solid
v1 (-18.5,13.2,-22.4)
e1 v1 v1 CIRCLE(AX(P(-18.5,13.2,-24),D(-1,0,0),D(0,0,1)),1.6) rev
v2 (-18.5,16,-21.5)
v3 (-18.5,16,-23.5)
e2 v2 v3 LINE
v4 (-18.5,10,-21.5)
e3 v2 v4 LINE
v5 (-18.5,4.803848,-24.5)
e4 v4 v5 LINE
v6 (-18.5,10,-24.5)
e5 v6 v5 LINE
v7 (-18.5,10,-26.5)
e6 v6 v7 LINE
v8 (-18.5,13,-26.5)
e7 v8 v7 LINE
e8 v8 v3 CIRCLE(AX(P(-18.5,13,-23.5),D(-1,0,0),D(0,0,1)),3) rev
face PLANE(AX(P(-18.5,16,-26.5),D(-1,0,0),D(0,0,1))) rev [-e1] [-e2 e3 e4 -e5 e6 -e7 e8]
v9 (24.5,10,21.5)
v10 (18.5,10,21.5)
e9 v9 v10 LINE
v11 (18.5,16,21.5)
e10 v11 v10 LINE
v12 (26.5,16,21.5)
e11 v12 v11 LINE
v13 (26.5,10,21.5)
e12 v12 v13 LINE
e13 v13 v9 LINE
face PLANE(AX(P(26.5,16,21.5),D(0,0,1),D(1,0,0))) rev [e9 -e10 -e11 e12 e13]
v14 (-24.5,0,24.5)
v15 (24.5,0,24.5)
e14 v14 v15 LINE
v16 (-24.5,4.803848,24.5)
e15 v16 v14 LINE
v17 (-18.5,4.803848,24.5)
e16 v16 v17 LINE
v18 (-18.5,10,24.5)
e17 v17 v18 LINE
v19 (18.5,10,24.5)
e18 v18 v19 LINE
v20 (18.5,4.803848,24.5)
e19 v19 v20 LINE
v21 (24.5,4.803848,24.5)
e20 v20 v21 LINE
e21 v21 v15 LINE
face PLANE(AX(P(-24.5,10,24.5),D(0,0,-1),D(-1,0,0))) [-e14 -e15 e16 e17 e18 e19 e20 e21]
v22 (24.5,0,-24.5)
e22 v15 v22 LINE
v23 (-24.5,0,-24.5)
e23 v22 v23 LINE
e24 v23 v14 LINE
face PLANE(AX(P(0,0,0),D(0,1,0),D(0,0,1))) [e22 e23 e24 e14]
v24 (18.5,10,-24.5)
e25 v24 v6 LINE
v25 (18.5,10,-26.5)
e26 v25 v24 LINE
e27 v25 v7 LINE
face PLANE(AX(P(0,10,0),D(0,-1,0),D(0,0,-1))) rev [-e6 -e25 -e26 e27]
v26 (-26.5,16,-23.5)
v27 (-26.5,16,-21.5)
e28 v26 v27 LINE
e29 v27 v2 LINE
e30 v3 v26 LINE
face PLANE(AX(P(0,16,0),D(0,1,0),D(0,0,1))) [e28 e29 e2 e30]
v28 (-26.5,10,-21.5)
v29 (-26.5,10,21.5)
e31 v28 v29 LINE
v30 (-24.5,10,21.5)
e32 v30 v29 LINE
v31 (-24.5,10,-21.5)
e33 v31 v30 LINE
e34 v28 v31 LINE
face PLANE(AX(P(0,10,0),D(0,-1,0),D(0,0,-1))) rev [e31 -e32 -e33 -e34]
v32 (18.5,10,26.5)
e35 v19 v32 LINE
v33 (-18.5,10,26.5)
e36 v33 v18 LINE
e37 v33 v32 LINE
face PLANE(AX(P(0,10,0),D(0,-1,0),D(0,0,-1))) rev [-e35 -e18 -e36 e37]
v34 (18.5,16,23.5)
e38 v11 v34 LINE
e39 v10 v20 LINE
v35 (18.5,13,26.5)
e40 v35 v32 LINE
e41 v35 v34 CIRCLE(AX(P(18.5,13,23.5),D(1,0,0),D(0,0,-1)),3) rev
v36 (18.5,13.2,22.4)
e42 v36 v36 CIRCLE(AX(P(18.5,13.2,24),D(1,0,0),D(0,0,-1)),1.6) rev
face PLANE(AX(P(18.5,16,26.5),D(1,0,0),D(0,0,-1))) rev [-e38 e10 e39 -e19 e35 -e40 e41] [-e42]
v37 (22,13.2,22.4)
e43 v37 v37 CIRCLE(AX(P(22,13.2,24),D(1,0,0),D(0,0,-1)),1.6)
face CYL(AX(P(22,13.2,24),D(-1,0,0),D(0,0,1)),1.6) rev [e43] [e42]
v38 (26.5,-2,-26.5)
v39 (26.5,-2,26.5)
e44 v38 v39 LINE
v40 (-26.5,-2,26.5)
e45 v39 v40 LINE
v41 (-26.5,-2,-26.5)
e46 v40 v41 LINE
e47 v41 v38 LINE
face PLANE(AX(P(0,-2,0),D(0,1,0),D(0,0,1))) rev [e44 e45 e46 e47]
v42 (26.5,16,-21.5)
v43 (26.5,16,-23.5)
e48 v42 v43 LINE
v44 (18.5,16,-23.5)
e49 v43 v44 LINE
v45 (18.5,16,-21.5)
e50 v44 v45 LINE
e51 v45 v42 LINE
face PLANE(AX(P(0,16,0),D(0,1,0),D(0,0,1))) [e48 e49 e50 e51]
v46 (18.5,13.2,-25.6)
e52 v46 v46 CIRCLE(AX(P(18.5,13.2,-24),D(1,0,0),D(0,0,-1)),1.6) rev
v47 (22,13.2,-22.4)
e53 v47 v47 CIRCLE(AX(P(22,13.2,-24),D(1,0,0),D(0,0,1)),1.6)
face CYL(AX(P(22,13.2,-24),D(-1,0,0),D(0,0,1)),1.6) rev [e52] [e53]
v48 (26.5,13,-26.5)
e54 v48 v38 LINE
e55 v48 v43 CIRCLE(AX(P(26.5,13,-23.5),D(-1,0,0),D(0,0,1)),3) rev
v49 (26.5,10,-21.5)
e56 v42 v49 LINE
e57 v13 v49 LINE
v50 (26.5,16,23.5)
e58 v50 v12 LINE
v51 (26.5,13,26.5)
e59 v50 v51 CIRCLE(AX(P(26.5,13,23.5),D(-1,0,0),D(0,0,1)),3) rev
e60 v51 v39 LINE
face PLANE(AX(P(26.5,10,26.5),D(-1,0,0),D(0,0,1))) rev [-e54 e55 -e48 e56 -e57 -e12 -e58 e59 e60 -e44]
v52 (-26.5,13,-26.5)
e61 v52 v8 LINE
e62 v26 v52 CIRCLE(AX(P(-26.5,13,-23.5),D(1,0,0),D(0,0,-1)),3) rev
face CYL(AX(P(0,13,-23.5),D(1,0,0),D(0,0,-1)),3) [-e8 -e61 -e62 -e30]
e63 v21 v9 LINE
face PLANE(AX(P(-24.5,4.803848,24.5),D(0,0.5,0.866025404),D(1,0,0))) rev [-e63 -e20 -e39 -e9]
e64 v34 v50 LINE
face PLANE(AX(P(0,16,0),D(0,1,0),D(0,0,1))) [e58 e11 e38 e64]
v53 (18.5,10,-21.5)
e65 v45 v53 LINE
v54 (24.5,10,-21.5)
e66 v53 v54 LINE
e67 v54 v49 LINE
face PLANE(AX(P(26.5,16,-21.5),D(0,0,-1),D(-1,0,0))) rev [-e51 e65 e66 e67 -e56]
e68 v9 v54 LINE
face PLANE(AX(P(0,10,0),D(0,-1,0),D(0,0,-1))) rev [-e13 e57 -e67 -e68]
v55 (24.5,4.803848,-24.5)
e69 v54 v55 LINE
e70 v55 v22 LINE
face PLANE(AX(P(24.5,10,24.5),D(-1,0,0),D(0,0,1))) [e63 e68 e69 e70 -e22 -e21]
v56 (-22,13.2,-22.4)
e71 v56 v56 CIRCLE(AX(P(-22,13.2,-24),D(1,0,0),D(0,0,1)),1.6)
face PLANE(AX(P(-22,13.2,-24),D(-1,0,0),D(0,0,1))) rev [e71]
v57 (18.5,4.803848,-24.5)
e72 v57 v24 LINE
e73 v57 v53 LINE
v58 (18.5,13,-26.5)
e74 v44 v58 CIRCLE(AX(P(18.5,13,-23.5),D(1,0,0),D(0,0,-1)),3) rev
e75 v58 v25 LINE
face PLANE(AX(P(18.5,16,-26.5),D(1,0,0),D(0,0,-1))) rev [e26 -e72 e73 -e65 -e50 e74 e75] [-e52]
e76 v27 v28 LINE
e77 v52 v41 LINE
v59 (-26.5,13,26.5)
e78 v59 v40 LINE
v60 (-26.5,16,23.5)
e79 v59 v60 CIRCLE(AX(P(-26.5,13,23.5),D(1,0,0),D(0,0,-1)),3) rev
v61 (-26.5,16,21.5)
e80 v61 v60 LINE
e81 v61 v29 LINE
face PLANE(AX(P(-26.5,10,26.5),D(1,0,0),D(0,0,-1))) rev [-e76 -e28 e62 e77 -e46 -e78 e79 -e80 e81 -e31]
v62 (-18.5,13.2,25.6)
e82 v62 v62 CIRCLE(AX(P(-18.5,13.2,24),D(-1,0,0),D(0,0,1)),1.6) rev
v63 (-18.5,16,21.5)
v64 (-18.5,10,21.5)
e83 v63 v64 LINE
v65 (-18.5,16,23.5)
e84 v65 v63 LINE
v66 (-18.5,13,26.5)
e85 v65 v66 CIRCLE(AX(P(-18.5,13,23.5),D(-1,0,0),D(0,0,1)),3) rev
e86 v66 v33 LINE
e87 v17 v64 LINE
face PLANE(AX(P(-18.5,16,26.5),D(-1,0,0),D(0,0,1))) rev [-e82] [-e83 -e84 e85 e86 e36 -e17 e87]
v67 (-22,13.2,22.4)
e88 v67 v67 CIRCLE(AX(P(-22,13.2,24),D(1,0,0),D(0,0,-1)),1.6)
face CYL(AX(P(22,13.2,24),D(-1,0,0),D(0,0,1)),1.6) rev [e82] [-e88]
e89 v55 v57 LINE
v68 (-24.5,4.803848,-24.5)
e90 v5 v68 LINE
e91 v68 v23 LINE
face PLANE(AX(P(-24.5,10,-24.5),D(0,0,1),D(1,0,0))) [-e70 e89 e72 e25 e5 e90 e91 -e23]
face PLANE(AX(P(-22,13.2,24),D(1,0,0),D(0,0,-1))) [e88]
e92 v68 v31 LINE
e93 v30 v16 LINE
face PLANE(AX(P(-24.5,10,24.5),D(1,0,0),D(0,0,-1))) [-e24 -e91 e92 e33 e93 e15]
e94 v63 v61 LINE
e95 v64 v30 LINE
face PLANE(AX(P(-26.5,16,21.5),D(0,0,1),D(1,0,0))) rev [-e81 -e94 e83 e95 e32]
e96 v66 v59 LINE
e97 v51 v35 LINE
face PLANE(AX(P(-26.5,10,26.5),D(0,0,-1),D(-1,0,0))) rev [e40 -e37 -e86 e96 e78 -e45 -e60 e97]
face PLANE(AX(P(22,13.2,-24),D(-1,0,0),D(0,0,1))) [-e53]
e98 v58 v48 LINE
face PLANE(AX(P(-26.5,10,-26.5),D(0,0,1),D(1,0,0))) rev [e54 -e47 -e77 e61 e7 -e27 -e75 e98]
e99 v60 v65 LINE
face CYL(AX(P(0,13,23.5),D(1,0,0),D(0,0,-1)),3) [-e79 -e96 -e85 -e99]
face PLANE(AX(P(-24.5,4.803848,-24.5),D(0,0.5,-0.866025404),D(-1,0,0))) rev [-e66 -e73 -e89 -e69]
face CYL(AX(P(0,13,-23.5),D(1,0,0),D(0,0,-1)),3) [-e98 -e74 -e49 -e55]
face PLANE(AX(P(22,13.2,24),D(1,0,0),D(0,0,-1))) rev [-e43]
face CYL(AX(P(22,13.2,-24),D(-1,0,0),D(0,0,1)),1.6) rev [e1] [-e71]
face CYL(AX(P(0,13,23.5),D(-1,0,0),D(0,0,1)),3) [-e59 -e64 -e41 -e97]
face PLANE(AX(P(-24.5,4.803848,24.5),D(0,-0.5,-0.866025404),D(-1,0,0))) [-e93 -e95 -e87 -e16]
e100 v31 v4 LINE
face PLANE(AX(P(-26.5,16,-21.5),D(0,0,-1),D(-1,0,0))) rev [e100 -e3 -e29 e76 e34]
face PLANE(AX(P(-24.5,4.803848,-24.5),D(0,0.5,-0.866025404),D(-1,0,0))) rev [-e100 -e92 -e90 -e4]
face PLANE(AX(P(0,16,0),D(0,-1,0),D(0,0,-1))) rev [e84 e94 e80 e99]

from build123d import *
from OCP.BRepFilletAPI import BRepFilletAPI_MakeChamfer

# Parameters (mm, degrees)
SKETCH1_W               = 53
SKETCH1_H               = 53
SKETCH1_W_2             = 49
SKETCH1_H_2             = 49
BOSS_EXTRUDE1_DEPTH     = 10
SKETCH2_W               = 53
SKETCH2_H               = 53
BOSS_EXTRUDE2_DEPTH     = 2
SKETCH3_W               = 8
SKETCH3_H               = 5
BOSS_EXTRUDE3_DEPTH     = 6
CHAMFER3_SIZE           = 5.196152423
CHAMFER3_SIZE_2         = 3
CUT_EXTRUDE1_DEPTH      = 22
CUT_EXTRUDE1_DEPTH_BACK = 22
SKETCH4_R               = 1.6
FILLET3_R               = 3


with BuildPart() as part:
    # Sketch1 → Boss-Extrude1 (new body)
    with BuildSketch(Plane(origin=(0, 0, 0), x_dir=(1, 0, 0), z_dir=(0, 1, 0))):
        Rectangle(SKETCH1_W, SKETCH1_H)
        Rectangle(SKETCH1_W_2, SKETCH1_H_2, mode=Mode.SUBTRACT)
    extrude(amount=BOSS_EXTRUDE1_DEPTH)

    # Sketch2 → Boss-Extrude2 (add)
    with BuildSketch(Plane.XZ):
        Rectangle(SKETCH2_W, SKETCH2_H)
    extrude(amount=BOSS_EXTRUDE2_DEPTH)

    # Sketch3 → Boss-Extrude3 (add)
    with BuildSketch(Plane(origin=(0, 10, 0), x_dir=(1, 0, 0), z_dir=(0, 1, 0))):
        with Locations((-22.5, -24)):
            Rectangle(SKETCH3_W, SKETCH3_H)
        with Locations((22.5, -24)):
            Rectangle(SKETCH3_W, SKETCH3_H)
        with Locations((22.5, 24)):
            Rectangle(SKETCH3_W, SKETCH3_H)
        with Locations((-22.5, 24)):
            Rectangle(SKETCH3_W, SKETCH3_H)
    extrude(amount=BOSS_EXTRUDE3_DEPTH)

    # Chamfer3
    chamfer3_edges_1 = [part.edges().sort_by_distance(p)[0] for p in [
        (-21.5, 10, -24.5),
    ]]
    chamfer3_side_1 = [part.faces().sort_by_distance(p)[0] for p in [
        (-21.5, 9.94, -24.5),
    ]]
    chamfer3_edges_2 = [part.edges().sort_by_distance(p)[0] for p in [
        (-21.5, 10, 24.5),
    ]]
    chamfer3_side_2 = [part.faces().sort_by_distance(p)[0] for p in [
        (-21.5, 10, 24.44),
    ]]
    chamfer3_edges_3 = [part.edges().sort_by_distance(p)[0] for p in [
        (21.5, 10, 24.5),
    ]]
    chamfer3_side_3 = [part.faces().sort_by_distance(p)[0] for p in [
        (21.5, 9.94, 24.5),
    ]]
    chamfer3_edges_4 = [part.edges().sort_by_distance(p)[0] for p in [
        (21.5, 10, -24.5),
    ]]
    chamfer3_side_4 = [part.faces().sort_by_distance(p)[0] for p in [
        (21.5, 10, -24.44),
    ]]
    chamfer3 = BRepFilletAPI_MakeChamfer(part.part.solid().wrapped)
    for e in chamfer3_edges_1:
        chamfer3.Add(CHAMFER3_SIZE - 0.0001, CHAMFER3_SIZE_2 - 0.0001, e.wrapped, chamfer3_side_1[0].wrapped)
    for e in chamfer3_edges_2:
        chamfer3.Add(CHAMFER3_SIZE_2 - 0.0001, CHAMFER3_SIZE - 0.0001, e.wrapped, chamfer3_side_2[0].wrapped)
    for e in chamfer3_edges_3:
        chamfer3.Add(CHAMFER3_SIZE - 0.0001, CHAMFER3_SIZE_2 - 0.0001, e.wrapped, chamfer3_side_3[0].wrapped)
    for e in chamfer3_edges_4:
        chamfer3.Add(CHAMFER3_SIZE_2 - 0.0001, CHAMFER3_SIZE - 0.0001, e.wrapped, chamfer3_side_4[0].wrapped)
    add(Compound.cast(chamfer3.Shape()), mode=Mode.REPLACE)  # a hair under: the kernel refuses the full size

    # Sketch4 → Cut-Extrude1 (cut, two sides: drawn at the far end of the back side and taken through both)
    with BuildSketch(Plane(origin=(0, 0, 0), x_dir=(0, 0, -1), z_dir=(1, 0, 0)).offset(-CUT_EXTRUDE1_DEPTH_BACK)):
        with Locations((-24, 13.2)):
            Circle(SKETCH4_R)
        with Locations(Location((24, 13.2, 0), (0, 0, 180))):
            Circle(SKETCH4_R)
    extrude(amount=CUT_EXTRUDE1_DEPTH + CUT_EXTRUDE1_DEPTH_BACK, mode=Mode.SUBTRACT)

    # Fillet3
    fillet3_edges = [part.edges().sort_by_distance(p)[0] for p in [
        (-22.5, 16, 26.5),
        (22.5, 16, 26.5),
        (22.5, 16, -26.5),
        (-22.5, 16, -26.5),
    ]]
    fillet(fillet3_edges, radius=FILLET3_R)


solid = part.part
